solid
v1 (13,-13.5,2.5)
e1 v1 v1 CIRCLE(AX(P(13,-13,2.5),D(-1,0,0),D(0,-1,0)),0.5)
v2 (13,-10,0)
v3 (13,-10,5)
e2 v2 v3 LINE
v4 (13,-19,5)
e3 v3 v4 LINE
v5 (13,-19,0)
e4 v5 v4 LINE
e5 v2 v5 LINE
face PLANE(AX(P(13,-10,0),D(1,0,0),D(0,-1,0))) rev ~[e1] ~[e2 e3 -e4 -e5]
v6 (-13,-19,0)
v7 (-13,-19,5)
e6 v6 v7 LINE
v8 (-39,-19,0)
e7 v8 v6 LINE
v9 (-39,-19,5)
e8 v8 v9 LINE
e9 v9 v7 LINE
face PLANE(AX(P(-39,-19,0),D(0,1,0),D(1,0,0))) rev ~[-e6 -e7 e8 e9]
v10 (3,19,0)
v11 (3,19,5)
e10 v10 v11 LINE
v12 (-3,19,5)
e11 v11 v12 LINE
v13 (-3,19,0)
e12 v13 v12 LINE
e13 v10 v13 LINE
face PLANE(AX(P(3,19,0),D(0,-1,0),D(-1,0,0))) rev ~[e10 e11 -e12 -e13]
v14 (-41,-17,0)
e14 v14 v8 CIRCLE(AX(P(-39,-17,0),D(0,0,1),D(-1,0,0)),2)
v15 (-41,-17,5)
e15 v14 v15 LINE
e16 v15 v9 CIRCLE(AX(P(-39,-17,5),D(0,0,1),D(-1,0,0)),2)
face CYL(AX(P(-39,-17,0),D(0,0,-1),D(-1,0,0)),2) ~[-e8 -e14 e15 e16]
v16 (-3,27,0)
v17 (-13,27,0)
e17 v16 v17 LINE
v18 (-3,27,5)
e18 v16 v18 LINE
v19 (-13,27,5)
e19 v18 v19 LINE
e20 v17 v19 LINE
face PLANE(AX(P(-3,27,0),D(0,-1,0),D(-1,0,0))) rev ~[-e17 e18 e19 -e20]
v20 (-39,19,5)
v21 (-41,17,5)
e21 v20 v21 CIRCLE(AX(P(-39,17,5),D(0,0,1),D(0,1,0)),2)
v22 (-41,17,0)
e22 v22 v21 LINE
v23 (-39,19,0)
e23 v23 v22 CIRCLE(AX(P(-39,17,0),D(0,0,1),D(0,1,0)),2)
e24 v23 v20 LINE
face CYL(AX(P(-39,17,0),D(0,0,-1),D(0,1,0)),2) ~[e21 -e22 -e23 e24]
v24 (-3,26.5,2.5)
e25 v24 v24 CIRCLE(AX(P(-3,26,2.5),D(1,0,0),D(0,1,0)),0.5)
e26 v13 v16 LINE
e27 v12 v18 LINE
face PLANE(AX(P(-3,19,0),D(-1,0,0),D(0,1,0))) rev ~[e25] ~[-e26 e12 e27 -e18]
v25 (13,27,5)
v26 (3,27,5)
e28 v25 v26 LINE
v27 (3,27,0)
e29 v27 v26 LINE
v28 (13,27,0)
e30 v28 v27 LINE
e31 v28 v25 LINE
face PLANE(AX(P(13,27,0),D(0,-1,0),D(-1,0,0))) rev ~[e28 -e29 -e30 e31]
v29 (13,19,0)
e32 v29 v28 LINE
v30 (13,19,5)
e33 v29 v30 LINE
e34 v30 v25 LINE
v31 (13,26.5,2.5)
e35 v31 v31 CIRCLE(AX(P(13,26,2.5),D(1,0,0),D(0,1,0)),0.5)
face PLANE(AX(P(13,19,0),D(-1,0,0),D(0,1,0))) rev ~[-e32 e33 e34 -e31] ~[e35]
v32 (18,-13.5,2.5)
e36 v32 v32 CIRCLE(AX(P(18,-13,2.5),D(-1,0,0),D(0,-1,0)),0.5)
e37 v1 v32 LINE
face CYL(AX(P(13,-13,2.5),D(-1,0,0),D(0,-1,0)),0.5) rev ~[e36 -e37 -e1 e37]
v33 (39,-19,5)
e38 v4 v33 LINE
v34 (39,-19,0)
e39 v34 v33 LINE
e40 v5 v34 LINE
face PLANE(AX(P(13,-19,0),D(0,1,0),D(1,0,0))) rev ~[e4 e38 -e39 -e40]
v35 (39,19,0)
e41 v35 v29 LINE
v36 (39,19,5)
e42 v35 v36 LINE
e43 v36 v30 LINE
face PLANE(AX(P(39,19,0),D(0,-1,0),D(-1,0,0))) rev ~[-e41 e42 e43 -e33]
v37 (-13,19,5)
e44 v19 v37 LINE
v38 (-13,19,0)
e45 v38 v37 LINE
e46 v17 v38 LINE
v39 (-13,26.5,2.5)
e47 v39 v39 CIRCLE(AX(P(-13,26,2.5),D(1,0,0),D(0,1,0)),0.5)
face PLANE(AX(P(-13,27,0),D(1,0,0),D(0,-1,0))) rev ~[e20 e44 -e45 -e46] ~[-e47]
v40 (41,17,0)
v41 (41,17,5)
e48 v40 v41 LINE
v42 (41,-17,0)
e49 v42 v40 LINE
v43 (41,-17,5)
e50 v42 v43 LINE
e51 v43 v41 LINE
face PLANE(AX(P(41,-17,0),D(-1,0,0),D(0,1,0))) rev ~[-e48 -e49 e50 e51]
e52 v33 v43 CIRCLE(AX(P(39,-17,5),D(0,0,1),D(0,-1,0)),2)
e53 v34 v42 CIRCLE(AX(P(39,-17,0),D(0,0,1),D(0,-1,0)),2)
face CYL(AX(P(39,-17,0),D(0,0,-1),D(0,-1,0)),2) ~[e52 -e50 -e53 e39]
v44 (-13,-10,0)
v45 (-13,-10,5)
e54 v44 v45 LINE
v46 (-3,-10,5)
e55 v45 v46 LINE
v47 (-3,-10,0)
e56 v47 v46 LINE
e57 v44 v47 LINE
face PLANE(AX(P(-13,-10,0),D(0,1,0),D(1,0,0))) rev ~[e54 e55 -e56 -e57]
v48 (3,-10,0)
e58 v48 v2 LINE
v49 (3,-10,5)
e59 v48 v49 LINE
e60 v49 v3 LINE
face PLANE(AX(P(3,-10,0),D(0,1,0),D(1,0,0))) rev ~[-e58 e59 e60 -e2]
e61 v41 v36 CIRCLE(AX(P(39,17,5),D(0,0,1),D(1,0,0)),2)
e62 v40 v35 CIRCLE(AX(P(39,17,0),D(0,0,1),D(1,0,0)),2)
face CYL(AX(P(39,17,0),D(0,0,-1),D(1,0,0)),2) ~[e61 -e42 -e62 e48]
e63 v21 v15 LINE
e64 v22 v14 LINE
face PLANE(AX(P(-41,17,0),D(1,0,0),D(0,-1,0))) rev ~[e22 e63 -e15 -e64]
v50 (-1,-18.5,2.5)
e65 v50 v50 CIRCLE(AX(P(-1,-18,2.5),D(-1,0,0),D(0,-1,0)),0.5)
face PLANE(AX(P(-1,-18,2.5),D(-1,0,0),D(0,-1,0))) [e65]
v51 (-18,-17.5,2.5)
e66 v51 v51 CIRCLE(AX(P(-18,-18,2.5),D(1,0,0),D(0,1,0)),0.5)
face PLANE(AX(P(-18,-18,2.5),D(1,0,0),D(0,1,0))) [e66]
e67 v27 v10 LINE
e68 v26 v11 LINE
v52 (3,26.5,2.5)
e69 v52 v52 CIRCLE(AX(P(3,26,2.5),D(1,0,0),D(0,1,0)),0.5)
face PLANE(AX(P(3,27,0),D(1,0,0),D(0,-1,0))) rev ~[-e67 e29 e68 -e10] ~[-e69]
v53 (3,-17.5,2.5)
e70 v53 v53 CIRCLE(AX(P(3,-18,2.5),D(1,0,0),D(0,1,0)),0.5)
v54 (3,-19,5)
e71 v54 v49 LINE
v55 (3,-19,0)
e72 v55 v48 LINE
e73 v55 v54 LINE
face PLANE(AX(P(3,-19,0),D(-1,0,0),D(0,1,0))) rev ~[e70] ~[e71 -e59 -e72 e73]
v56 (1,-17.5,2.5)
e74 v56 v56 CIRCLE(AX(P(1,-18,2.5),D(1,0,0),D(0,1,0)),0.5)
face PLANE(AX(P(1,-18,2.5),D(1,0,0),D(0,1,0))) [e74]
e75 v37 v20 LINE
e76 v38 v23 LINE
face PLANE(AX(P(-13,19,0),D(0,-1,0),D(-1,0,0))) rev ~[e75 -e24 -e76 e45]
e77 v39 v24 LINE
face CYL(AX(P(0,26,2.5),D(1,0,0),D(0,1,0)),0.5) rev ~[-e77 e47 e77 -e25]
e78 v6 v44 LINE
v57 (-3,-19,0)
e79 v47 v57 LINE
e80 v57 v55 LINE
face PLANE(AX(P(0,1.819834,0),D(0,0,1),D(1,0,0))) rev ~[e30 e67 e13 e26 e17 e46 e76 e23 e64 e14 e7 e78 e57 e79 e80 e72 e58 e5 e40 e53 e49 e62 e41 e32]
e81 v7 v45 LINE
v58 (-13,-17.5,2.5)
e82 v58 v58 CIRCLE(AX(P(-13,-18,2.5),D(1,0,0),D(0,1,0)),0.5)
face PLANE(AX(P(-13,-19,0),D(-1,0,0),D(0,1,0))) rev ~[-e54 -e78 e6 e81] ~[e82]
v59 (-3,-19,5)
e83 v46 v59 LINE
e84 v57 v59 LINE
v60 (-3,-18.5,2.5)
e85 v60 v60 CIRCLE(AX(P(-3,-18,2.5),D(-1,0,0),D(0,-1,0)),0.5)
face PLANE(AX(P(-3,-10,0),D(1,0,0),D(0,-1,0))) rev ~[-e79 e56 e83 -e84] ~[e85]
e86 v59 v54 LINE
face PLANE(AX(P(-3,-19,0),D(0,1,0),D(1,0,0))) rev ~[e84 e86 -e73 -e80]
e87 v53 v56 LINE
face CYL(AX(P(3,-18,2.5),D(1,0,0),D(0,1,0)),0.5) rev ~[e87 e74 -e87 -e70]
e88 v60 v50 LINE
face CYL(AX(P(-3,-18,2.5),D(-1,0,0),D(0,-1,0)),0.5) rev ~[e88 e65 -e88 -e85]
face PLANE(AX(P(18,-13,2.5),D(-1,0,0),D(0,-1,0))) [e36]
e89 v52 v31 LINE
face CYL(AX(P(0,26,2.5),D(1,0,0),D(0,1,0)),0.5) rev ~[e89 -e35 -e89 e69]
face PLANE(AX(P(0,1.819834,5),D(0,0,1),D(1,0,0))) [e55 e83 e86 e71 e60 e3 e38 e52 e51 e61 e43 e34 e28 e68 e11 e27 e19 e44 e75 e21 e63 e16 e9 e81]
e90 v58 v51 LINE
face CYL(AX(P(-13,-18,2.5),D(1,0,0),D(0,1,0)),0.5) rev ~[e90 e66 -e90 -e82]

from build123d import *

# Parameters (mm, degrees)
F1_DEPTH  = 5
F2_R      = 0.5
F3_DEPTH  = 2
F4_R      = 0.5
F5_DEPTH  = 5
F6_R      = 0.5
F7_DEPTH  = 2
F8_R      = 0.5
F9_DEPTH  = 5
F10_R     = 0.5
F11_DEPTH = 14.478


with BuildPart() as f1:
    # F0 (on Top) → F1 (new body)
    with BuildSketch(Plane.XY):
        with BuildLine():
            ThreePointArc((-39, 19), (-40.4142135624, 18.4142135624), (-41, 17))
            Line((-41, 17), (-41, -17))
            ThreePointArc((-41, -17), (-40.4142135624, -18.4142135624), (-39, -19))
            Line((-39, -19), (-13, -19))
            Line((-13, -19), (-13, -10))
            Line((-13, -10), (-3, -10))
            Line((-3, -10), (-3, -19))
            Line((-3, -19), (3, -19))
            Line((3, -19), (3, -10))
            Line((3, -10), (13, -10))
            Line((13, -10), (13, -19))
            Line((13, -19), (39, -19))
            ThreePointArc((39, -19), (40.4142135624, -18.4142135624), (41, -17))
            Line((41, -17), (41, 17))
            ThreePointArc((41, 17), (40.4142135624, 18.4142135624), (39, 19))
            Line((39, 19), (13, 19))
            Line((13, 19), (13, 27))
            Line((13, 27), (3, 27))
            Line((3, 27), (3, 19))
            Line((3, 19), (-3, 19))
            Line((-3, 19), (-3, 27))
            Line((-3, 27), (-13, 27))
            Line((-13, 27), (-13, 19))
            Line((-13, 19), (-39, 19))
        make_face()
    extrude(amount=F1_DEPTH)

    # F2 (on face) → F3 (cut)
    with BuildSketch(Plane.YZ.offset(3)):
        with Locations((-18, 2.5)):
            Circle(F2_R)
    extrude(amount=-F3_DEPTH, mode=Mode.SUBTRACT)

    # F4 (on face) → F5 (cut)
    with BuildSketch(Plane(origin=(13, 0, 0), x_dir=(0, -1, 0), z_dir=(-1, 0, 0))):
        with Locations((13, 2.5)):
            Circle(F4_R)
    extrude(amount=-F5_DEPTH, mode=Mode.SUBTRACT)

    # F6 (on face) → F7 (cut)
    with BuildSketch(Plane(origin=(-3, 0, 0), x_dir=(0, -1, 0), z_dir=(-1, 0, 0))):
        with Locations((18, 2.5)):
            Circle(F6_R)
    extrude(amount=-F7_DEPTH, mode=Mode.SUBTRACT)

    # F8 (on face) → F9 (cut)
    with BuildSketch(Plane.YZ.offset(-13)):
        with Locations((-18, 2.5)):
            Circle(F8_R)
    extrude(amount=-F9_DEPTH, mode=Mode.SUBTRACT)

    # F10 (on Right) → F11 (cut, symmetric)
    with BuildSketch(Plane.YZ):
        with Locations((26, 2.5)):
            Circle(F10_R)
    extrude(amount=F11_DEPTH, both=True, mode=Mode.SUBTRACT)


solid = f1.part
